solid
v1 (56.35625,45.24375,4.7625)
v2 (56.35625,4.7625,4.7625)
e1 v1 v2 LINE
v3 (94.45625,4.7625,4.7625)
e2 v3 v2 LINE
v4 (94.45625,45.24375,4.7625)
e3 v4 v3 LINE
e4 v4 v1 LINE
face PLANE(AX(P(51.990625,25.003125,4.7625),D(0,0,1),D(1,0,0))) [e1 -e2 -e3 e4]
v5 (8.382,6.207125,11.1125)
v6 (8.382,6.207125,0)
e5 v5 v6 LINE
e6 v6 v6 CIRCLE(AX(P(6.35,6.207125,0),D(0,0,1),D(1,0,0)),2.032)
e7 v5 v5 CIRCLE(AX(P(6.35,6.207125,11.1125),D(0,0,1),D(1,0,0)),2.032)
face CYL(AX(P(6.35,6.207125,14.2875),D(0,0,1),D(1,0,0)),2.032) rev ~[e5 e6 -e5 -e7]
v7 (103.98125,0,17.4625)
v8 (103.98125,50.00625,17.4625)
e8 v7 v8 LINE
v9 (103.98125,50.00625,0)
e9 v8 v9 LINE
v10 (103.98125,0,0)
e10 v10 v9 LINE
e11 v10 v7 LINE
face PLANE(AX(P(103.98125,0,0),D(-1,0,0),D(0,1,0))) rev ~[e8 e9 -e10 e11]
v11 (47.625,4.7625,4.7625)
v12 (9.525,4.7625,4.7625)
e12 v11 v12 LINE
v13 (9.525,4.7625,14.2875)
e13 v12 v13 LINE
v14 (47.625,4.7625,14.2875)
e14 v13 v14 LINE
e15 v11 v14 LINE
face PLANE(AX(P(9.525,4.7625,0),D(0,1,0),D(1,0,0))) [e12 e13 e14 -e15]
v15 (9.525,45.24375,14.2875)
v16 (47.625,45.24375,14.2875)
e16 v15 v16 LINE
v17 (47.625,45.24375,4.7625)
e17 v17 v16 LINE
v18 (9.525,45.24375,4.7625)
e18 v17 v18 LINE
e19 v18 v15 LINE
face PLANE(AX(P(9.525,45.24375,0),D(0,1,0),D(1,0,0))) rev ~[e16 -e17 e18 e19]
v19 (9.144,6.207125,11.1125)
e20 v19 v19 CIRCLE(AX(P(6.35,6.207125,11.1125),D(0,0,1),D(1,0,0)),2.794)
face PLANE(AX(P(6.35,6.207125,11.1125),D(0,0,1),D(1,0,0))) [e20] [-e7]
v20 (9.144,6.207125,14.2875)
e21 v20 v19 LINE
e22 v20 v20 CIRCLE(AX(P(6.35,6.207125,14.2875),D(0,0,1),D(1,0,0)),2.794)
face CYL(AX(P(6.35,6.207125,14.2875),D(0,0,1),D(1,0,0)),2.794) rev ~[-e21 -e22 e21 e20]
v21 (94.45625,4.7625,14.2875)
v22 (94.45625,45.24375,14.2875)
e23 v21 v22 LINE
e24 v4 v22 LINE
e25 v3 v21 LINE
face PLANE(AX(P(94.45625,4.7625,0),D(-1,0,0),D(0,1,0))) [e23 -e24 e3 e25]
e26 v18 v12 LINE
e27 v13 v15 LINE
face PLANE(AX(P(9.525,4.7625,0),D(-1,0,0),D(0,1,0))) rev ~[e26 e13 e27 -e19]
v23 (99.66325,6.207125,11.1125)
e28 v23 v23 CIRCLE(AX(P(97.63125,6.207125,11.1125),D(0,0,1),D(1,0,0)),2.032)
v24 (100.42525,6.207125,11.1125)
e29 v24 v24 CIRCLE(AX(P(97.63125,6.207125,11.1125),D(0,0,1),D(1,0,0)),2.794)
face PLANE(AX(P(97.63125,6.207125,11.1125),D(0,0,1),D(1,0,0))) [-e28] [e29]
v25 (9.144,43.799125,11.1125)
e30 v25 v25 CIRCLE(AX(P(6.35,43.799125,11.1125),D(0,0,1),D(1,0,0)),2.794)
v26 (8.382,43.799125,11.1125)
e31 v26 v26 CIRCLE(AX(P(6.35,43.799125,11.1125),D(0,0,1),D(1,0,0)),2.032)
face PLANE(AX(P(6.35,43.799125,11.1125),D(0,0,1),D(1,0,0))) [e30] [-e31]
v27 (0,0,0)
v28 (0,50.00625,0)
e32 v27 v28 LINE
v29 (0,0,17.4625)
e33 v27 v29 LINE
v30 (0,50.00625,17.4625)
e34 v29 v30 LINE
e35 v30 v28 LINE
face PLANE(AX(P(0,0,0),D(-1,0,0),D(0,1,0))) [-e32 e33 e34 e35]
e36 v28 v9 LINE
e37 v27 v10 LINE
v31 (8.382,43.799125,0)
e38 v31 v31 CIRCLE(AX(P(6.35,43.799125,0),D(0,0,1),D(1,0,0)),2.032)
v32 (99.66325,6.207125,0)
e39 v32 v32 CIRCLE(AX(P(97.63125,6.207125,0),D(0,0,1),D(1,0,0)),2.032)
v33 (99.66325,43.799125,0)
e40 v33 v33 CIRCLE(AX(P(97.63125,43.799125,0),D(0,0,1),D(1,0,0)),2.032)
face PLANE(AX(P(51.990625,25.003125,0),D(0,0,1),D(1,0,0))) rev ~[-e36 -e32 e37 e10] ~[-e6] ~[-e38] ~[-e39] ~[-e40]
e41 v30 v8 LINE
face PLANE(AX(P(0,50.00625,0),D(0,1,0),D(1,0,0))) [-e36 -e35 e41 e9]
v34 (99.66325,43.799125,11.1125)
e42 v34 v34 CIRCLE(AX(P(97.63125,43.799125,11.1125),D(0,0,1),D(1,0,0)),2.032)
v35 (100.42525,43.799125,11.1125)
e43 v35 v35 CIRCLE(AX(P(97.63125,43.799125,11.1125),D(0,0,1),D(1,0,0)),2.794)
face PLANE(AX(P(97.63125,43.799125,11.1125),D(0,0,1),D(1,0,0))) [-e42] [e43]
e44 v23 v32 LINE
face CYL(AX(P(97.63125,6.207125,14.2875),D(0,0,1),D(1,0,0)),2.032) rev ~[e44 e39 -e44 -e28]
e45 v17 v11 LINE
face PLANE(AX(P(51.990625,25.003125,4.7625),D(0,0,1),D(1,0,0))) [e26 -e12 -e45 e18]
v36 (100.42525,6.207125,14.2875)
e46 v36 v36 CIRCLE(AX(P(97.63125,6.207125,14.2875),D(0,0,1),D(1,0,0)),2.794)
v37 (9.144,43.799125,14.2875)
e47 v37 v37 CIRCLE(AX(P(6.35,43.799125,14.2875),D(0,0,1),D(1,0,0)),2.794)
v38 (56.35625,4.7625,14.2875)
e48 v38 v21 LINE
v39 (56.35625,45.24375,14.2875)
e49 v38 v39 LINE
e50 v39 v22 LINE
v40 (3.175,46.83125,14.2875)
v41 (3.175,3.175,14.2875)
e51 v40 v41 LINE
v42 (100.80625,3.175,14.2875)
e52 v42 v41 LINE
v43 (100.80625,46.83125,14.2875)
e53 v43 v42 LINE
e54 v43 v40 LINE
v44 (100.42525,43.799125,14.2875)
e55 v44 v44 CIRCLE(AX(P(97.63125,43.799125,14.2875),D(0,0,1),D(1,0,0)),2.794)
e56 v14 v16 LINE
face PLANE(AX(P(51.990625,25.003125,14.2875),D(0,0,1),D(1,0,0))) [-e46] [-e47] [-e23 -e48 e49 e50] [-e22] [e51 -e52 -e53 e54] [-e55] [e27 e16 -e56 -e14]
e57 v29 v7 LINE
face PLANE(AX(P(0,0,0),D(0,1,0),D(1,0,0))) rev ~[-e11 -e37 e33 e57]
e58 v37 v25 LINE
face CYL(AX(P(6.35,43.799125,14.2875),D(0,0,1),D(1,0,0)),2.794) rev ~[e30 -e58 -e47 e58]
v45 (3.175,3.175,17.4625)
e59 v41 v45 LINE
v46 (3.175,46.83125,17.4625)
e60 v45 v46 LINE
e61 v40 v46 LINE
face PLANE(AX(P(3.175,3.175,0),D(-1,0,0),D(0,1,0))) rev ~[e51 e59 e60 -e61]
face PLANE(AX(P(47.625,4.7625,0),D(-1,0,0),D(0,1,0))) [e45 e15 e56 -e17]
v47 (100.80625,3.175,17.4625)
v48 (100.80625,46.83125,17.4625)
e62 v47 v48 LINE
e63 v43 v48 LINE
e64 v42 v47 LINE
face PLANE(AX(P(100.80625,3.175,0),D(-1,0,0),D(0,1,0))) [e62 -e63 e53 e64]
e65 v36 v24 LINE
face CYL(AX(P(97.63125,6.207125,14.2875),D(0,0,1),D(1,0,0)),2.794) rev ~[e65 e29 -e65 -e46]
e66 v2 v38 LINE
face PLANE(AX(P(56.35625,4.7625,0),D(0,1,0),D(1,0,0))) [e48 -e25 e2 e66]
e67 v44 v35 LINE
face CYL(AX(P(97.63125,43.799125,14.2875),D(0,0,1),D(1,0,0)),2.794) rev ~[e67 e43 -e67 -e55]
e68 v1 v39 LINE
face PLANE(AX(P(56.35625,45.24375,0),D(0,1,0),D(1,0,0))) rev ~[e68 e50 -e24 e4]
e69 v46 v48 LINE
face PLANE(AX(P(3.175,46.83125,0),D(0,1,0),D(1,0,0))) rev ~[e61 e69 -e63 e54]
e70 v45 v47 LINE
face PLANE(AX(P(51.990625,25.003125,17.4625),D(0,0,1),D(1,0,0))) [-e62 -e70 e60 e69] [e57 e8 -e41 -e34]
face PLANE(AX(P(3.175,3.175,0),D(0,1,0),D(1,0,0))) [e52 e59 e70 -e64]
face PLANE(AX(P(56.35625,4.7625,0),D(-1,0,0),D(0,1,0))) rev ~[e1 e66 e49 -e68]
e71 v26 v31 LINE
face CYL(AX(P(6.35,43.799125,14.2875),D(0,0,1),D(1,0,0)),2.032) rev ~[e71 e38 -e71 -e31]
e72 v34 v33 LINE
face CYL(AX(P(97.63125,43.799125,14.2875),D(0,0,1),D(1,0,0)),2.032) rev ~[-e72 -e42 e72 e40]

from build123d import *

# Parameters (mm, degrees)
F0_W     = 103.98125
F0_H     = 50.00625
F0_W_2   = 97.63125
F0_H_2   = 43.65625
F0_W_3   = 38.1
F0_H_3   = 40.48125
F1_DEPTH = 4.7625
F2_DEPTH = 14.2875
F3_DEPTH = 17.4625
F4_R     = 2.794
F4_R_2   = 2.032
F5_DEPTH = 3.175
F6_DEPTH = 14.2875


with BuildPart() as f1:
    # F0 (on Top) → F1 (new body)
    with BuildSketch(Plane.XY):
        with Locations((51.990625, 25.003125)):
            Rectangle(F0_W, F0_H)
        with Locations((51.990625, 25.003125)):
            Rectangle(F0_W_2, F0_H_2, mode=Mode.SUBTRACT)
        with Locations((51.990625, 25.003125)):
            Rectangle(F0_W_2, F0_H_2)
        with Locations((28.575, 25.003125)):
            Rectangle(F0_W_3, F0_H_3, mode=Mode.SUBTRACT)
        with Locations((75.40625, 25.003125)):
            Rectangle(F0_W_3, F0_H_3, mode=Mode.SUBTRACT)
        with Locations((28.575, 25.003125)):
            Rectangle(F0_W_3, F0_H_3)
        with Locations((75.40625, 25.003125)):
            Rectangle(F0_W_3, F0_H_3)
    extrude(amount=F1_DEPTH)

    # F0 (on Top) → F2 (join)
    with BuildSketch(Plane.XY):
        with Locations((51.990625, 25.003125)):
            Rectangle(F0_W, F0_H)
        with Locations((51.990625, 25.003125)):
            Rectangle(F0_W_2, F0_H_2, mode=Mode.SUBTRACT)
        with Locations((51.990625, 25.003125)):
            Rectangle(F0_W_2, F0_H_2)
        with Locations((28.575, 25.003125)):
            Rectangle(F0_W_3, F0_H_3, mode=Mode.SUBTRACT)
        with Locations((75.40625, 25.003125)):
            Rectangle(F0_W_3, F0_H_3, mode=Mode.SUBTRACT)
    extrude(amount=F2_DEPTH)

    # F0 (on Top) → F3 (join)
    with BuildSketch(Plane.XY):
        with Locations((51.990625, 25.003125)):
            Rectangle(F0_W, F0_H)
        with Locations((51.990625, 25.003125)):
            Rectangle(F0_W_2, F0_H_2, mode=Mode.SUBTRACT)
    extrude(amount=F3_DEPTH)

    # F4 (on face) → F5 (cut)
    with BuildSketch(Plane.XY.offset(14.2875)):
        with Locations((6.35, 43.799125)):
            Circle(F4_R)
        with Locations((6.35, 43.799125)):
            Circle(F4_R_2, mode=Mode.SUBTRACT)
        with Locations((6.35, 6.207125)):
            Circle(F4_R)
        with Locations((6.35, 6.207125)):
            Circle(F4_R_2, mode=Mode.SUBTRACT)
        with Locations((97.63125, 43.799125)):
            Circle(F4_R)
        with Locations((97.63125, 43.799125)):
            Circle(F4_R_2, mode=Mode.SUBTRACT)
        with Locations((97.63125, 6.207125)):
            Circle(F4_R)
        with Locations((97.63125, 6.207125)):
            Circle(F4_R_2, mode=Mode.SUBTRACT)
    extrude(amount=-F5_DEPTH, mode=Mode.SUBTRACT)

    # F6 (cut, through all): faces of the model
    f6_faces = [f1.faces().sort_by_distance(p)[0] for p in [
        (6.35, 43.799125, 14.2875),
        (97.63125, 43.799125, 14.2875),
        (97.63125, 6.207125, 14.2875),
        (6.35, 6.207125, 14.2875),
    ]]
    extrude(f6_faces, amount=-F6_DEPTH, mode=Mode.SUBTRACT)


solid = f1.part
